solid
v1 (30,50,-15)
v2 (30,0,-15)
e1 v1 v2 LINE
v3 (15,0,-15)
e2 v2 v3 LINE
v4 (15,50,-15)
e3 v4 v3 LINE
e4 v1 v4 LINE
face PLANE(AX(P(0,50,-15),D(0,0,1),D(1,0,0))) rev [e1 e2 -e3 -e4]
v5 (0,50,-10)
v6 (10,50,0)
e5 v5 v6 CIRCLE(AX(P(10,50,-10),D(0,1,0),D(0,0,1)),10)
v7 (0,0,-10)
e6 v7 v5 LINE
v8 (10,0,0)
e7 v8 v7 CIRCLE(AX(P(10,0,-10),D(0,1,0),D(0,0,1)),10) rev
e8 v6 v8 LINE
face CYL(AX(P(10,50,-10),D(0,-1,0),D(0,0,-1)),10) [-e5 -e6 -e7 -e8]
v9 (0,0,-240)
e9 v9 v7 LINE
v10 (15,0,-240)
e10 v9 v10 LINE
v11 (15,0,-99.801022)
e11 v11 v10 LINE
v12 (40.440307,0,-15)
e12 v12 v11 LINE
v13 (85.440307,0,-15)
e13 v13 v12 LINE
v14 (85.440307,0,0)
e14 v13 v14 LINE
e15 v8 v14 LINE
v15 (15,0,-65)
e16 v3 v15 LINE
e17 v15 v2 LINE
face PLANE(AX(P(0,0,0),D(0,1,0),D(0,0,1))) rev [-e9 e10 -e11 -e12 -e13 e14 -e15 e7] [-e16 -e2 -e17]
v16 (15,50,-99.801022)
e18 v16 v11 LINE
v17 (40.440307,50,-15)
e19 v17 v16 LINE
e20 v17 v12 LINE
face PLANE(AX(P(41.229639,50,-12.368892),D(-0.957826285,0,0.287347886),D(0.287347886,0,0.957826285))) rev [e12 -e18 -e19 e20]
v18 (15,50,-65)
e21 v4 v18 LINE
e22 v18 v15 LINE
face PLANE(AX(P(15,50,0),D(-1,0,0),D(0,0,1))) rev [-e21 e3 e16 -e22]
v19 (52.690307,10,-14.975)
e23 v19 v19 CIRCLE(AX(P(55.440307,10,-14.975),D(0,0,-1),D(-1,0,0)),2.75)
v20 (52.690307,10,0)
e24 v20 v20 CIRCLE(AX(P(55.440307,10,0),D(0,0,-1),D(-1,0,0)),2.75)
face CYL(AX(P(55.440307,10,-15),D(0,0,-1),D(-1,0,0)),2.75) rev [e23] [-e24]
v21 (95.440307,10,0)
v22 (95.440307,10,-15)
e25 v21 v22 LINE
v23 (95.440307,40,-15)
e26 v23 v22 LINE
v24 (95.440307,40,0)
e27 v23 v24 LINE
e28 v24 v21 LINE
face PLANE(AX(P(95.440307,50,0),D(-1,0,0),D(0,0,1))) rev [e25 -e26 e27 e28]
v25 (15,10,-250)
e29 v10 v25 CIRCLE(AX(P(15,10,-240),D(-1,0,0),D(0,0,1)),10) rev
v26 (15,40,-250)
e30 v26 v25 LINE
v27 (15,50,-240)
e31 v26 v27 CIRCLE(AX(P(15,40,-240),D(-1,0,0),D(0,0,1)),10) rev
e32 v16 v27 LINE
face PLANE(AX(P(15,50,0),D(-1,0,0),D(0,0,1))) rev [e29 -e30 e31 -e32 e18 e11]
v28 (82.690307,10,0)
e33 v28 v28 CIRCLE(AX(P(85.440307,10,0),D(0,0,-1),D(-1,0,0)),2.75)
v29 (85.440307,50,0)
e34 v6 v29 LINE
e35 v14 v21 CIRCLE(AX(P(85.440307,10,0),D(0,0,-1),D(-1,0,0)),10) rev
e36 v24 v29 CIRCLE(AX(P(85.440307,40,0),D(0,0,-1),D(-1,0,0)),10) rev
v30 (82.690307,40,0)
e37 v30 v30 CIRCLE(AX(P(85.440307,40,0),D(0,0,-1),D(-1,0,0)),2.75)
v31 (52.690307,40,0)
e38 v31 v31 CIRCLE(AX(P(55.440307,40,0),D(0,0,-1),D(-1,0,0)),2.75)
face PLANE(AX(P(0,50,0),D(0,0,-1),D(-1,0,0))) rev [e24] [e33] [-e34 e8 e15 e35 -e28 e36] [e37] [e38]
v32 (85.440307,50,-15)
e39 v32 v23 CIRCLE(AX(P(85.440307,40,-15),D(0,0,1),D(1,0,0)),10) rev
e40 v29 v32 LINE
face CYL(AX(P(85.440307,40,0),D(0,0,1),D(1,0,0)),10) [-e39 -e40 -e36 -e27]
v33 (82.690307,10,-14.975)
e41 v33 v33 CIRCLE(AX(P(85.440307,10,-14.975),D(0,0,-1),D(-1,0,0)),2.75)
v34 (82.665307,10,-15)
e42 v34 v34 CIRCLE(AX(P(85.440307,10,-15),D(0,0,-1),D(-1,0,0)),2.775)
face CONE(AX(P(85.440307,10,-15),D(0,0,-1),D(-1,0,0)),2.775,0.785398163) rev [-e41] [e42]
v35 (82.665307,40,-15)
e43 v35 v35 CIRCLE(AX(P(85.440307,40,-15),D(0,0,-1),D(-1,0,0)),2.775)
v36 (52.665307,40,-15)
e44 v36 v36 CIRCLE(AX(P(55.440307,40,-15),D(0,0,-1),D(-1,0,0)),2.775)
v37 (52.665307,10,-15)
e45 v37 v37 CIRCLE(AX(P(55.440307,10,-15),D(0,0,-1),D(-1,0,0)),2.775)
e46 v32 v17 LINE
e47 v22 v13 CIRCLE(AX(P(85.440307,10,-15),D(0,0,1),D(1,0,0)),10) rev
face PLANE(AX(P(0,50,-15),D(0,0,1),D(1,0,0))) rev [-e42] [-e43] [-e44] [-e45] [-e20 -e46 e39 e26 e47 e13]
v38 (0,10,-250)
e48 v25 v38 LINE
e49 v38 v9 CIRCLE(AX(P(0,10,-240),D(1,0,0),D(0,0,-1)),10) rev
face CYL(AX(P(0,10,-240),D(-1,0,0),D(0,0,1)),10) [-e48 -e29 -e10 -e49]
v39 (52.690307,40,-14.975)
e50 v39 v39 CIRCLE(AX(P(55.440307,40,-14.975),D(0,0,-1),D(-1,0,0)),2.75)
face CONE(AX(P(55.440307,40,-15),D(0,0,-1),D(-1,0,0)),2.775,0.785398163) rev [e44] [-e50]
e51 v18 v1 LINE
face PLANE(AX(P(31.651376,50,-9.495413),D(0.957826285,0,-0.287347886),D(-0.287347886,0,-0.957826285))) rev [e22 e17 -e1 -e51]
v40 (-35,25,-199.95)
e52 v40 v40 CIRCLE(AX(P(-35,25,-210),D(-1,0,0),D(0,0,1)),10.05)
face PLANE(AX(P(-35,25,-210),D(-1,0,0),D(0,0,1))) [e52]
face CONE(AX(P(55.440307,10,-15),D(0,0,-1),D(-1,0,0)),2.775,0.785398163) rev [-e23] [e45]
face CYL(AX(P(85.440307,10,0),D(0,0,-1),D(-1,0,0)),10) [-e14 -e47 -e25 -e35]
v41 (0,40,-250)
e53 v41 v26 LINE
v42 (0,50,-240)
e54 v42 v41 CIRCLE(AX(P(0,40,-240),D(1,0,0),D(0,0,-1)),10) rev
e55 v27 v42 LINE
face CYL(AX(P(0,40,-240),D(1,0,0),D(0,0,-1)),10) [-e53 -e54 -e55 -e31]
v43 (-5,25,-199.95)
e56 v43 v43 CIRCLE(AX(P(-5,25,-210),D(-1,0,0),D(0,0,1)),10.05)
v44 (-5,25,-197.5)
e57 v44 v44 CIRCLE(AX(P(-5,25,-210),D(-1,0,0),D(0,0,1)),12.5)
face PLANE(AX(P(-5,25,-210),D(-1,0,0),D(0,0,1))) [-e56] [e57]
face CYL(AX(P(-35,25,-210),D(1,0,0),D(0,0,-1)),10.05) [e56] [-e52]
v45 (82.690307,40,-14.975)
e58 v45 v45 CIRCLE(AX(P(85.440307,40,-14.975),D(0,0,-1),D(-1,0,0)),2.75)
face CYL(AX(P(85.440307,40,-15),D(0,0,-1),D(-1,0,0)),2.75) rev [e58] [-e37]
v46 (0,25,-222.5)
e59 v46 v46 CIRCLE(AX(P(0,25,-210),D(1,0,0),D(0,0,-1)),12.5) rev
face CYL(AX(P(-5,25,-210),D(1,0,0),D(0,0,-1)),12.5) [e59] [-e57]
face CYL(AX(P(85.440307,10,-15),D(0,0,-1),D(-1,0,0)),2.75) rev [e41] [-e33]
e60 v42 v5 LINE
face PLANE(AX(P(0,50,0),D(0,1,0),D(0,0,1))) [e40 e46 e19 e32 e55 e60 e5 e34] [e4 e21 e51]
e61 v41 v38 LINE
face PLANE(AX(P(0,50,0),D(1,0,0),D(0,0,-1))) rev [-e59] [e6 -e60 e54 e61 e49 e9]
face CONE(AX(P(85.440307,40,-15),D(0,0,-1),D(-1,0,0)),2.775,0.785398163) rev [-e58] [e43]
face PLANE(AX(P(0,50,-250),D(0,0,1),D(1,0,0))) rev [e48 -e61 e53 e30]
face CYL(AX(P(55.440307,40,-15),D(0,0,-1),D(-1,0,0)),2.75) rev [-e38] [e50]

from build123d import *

# Parameters (mm, degrees)
BOSS_EXTRUDE1_DEPTH = 50
FILLET2_R           = 10
SKETCH18_R          = 12.5
BOSS_EXTRUDE2_DEPTH = 5
SKETCH19_R          = 10.05
BOSS_EXTRUDE3_DEPTH = 30
FILLET1_R           = 10


# Read off the part's stored shape, not the designer's step: M5 Clearance Hole3
with BuildPart() as part:
    # Sketch1 → Boss-Extrude1 (new body)
    with BuildSketch(Plane(origin=(0, 0, 0), x_dir=(1, 0, 0), z_dir=(0, 1, 0))):
        Polygon((15, 15), (15, 250), (0, 250), (0, 0), (95.440306509, 0), (95.440306509, 15), align=None)
        Polygon((40.440306509, 15), (15, 99.801021696), (15, 65), (30, 15), align=None)
    extrude(amount=BOSS_EXTRUDE1_DEPTH)

    # Fillet2
    fillet2_edges = [part.edges().sort_by_distance(p)[0] for p in [
        (0, 25, 0),
    ]]
    fillet(fillet2_edges, radius=FILLET2_R)

    # M5 Clearance Hole3 outline → M5 Clearance Hole3 (revolve, cut)
    with BuildSketch(Plane(origin=(55.440306509, 40, 0), x_dir=(1, 0, 0), z_dir=(0, -1, 0))):
        Polygon((2.75, -14.975), (2.75, 0), (0, 0), (0, -15), (2.775, -15), align=None)
    revolve(axis=Axis((55.440306509, 40, 0), (0, 0, 1)), mode=Mode.SUBTRACT)

    # M5 Clearance Hole3 2 outline → M5 Clearance Hole3 2 (revolve, cut)
    with BuildSketch(Plane(origin=(85.440306509, 10, 0), x_dir=(1, 0, 0), z_dir=(0, -1, 0))):
        Polygon((2.75, -14.975), (2.75, 0), (0, 0), (0, -15), (2.775, -15), align=None)
    revolve(axis=Axis((85.440306509, 10, 0), (0, 0, 1)), mode=Mode.SUBTRACT)

    # M5 Clearance Hole3 3 outline → M5 Clearance Hole3 3 (revolve, cut)
    with BuildSketch(Plane(origin=(55.440306509, 10, 0), x_dir=(1, 0, 0), z_dir=(0, -1, 0))):
        Polygon((2.75, -14.975), (2.75, 0), (0, 0), (0, -15), (2.775, -15), align=None)
    revolve(axis=Axis((55.440306509, 10, 0), (0, 0, 1)), mode=Mode.SUBTRACT)

    # M5 Clearance Hole3 4 outline → M5 Clearance Hole3 4 (revolve, cut)
    with BuildSketch(Plane(origin=(85.440306509, 40, 0), x_dir=(1, 0, 0), z_dir=(0, -1, 0))):
        Polygon((2.75, -14.975), (2.75, 0), (0, 0), (0, -15), (2.775, -15), align=None)
    revolve(axis=Axis((85.440306509, 40, 0), (0, 0, 1)), mode=Mode.SUBTRACT)

    # Sketch18 → Boss-Extrude2 (add)
    with BuildSketch(Plane.ZY):
        with Locations(Location((-210, 25, 0), (0, 0, 180))):
            Circle(SKETCH18_R)
    extrude(amount=BOSS_EXTRUDE2_DEPTH)

    # Sketch19 → Boss-Extrude3 (add)
    with BuildSketch(Plane.ZY.offset(5)):
        with Locations((-210, 25)):
            Circle(SKETCH19_R)
    extrude(amount=BOSS_EXTRUDE3_DEPTH)

    # Fillet1
    fillet1_edges = [part.edges().sort_by_distance(p)[0] for p in [
        (95.440306509, 0, -7.5),
        (7.5, 0, -250),
        (7.5, 50, -250),
        (95.440306509, 50, -7.5),
    ]]
    fillet(fillet1_edges, radius=FILLET1_R)


solid = part.part
